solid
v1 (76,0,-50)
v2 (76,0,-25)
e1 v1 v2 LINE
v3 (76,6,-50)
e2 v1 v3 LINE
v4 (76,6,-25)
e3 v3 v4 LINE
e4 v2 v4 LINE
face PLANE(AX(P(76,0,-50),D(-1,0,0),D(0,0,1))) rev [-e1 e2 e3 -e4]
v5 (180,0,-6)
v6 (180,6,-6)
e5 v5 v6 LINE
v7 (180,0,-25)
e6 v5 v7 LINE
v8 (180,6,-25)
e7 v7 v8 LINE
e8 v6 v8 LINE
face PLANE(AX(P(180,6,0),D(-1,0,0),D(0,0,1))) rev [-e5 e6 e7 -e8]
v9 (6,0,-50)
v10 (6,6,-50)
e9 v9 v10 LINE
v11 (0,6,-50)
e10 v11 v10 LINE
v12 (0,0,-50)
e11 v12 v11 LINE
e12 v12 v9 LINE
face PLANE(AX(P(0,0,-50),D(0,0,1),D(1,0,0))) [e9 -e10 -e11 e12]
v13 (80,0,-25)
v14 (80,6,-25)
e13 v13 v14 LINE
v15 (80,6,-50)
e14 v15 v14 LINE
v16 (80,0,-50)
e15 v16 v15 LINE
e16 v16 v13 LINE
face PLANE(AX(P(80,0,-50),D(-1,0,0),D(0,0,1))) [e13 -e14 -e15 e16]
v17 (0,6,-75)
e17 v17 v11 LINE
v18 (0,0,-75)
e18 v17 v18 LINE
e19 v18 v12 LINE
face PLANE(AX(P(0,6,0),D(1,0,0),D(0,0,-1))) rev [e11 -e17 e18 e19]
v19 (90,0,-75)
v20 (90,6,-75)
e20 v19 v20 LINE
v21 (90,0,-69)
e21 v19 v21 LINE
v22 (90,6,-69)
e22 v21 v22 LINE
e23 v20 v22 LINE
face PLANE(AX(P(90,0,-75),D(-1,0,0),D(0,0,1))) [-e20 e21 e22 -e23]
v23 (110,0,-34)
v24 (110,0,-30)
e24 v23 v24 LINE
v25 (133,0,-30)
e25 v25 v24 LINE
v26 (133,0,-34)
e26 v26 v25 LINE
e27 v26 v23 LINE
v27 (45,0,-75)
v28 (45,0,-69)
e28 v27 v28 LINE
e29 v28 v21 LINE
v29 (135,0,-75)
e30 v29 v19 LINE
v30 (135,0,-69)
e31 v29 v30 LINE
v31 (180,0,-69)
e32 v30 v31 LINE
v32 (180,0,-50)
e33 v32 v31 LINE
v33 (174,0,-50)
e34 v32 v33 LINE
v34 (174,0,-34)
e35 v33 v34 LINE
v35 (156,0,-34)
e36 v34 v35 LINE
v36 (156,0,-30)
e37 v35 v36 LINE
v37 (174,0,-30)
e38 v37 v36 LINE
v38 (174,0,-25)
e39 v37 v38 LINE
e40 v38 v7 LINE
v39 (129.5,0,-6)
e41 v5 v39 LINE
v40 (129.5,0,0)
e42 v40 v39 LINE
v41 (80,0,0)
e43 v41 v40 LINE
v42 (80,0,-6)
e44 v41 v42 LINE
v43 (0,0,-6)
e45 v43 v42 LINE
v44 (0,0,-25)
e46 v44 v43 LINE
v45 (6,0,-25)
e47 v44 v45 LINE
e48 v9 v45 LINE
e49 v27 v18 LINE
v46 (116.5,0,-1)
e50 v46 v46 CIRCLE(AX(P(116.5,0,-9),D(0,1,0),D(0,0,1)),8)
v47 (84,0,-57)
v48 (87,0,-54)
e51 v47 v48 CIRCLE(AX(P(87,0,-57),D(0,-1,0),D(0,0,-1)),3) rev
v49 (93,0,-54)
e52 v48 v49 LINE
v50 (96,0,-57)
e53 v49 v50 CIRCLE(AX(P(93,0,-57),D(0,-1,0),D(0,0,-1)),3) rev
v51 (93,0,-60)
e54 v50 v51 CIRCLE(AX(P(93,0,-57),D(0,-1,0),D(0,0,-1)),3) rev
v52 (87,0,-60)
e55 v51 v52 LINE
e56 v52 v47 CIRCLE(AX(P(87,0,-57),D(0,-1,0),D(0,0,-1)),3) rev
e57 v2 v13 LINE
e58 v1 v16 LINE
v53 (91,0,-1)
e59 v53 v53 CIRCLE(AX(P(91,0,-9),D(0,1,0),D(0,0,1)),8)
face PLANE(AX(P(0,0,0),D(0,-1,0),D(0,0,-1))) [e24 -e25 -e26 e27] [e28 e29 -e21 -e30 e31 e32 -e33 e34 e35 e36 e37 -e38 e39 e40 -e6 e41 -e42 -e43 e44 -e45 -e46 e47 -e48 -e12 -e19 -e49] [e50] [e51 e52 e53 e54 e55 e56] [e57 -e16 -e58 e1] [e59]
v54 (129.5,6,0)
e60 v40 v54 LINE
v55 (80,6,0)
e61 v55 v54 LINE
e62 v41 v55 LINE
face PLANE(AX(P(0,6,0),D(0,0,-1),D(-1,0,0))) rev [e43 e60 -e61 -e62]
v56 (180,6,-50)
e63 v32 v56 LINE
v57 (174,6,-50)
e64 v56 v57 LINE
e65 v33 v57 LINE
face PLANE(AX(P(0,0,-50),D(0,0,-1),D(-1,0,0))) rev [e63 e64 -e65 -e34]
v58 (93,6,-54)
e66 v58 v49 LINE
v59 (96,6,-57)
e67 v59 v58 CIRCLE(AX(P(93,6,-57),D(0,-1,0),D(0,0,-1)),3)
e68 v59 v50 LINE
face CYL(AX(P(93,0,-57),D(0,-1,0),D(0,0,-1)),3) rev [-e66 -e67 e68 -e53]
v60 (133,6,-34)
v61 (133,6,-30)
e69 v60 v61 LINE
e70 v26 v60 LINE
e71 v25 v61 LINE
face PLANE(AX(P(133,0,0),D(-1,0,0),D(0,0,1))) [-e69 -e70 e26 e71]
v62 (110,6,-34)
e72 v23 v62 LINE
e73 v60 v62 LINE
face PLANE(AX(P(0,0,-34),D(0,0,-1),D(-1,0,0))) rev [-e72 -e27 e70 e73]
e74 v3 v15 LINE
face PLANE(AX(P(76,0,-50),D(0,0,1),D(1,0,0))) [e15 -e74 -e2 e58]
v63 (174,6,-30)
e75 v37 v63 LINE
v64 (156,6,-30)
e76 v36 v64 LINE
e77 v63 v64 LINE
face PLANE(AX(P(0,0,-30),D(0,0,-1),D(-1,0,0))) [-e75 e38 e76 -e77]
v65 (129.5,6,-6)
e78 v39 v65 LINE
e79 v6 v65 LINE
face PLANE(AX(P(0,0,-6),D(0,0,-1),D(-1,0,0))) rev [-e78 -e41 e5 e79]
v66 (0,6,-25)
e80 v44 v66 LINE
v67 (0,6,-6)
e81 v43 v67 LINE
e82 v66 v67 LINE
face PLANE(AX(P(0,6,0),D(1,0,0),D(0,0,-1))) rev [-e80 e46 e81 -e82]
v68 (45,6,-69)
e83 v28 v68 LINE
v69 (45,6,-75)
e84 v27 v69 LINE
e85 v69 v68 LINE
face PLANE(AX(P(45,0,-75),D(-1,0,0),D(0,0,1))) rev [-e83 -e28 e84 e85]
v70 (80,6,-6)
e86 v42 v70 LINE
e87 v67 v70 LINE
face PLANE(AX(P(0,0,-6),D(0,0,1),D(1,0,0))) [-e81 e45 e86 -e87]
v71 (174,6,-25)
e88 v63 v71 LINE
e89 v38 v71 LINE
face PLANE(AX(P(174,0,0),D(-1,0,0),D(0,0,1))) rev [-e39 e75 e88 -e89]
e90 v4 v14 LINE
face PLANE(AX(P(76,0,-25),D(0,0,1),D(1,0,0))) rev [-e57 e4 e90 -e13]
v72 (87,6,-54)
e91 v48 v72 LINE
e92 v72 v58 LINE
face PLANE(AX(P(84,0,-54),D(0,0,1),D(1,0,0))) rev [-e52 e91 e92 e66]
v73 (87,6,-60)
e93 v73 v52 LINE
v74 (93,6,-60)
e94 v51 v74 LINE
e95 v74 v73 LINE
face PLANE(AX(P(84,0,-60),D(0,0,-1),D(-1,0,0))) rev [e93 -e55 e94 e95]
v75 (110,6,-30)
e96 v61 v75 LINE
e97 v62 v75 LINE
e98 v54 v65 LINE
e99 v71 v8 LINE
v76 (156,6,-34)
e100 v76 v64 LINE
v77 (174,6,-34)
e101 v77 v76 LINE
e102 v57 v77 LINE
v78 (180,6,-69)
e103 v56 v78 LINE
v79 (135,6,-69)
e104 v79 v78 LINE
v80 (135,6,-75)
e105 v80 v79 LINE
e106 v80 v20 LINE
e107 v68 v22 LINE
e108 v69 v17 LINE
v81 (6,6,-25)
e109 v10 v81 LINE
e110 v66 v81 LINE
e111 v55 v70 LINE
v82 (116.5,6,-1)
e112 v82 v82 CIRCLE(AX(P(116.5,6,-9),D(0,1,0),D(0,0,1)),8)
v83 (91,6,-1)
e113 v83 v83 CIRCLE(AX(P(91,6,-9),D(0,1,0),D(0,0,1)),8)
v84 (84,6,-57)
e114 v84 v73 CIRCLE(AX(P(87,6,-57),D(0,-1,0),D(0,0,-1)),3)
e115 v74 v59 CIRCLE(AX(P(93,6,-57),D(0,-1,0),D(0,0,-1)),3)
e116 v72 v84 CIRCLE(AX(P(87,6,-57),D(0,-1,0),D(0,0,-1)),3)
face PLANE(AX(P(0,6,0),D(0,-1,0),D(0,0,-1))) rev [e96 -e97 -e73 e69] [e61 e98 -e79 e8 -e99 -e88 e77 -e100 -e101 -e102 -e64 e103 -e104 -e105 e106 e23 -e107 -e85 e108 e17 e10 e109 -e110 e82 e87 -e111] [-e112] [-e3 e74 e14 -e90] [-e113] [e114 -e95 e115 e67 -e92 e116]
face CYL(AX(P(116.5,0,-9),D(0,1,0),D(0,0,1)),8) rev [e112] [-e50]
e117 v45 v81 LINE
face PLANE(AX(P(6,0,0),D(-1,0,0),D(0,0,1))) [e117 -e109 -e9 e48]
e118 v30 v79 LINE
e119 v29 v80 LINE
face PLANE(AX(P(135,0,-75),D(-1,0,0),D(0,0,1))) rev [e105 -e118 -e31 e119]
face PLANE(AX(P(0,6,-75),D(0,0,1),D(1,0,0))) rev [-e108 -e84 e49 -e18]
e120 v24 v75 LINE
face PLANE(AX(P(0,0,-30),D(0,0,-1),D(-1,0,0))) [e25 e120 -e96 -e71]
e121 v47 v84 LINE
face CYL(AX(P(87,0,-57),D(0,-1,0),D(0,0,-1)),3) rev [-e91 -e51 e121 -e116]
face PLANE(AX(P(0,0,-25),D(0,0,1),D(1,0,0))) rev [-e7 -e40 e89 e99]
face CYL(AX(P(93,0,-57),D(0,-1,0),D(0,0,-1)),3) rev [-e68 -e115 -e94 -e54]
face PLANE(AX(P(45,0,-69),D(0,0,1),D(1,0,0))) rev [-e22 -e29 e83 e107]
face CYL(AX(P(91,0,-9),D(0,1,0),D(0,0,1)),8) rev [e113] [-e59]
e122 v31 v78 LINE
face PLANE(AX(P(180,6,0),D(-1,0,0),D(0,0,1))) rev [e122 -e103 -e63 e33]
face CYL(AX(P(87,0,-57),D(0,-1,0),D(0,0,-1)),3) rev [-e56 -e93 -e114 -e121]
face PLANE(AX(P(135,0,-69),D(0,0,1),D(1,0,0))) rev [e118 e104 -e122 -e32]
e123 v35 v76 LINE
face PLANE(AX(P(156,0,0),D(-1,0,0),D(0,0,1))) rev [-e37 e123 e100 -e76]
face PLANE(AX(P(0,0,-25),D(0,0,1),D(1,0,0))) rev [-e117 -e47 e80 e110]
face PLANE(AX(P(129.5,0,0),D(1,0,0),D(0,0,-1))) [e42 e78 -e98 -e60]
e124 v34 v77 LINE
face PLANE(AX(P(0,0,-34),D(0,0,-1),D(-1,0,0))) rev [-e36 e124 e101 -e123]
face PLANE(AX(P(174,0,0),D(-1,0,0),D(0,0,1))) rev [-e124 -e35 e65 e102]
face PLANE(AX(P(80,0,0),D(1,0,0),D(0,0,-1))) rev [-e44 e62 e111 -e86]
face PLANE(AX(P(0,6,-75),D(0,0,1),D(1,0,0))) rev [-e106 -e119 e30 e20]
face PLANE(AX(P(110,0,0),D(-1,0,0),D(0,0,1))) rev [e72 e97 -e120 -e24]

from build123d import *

# Parameters (mm, degrees)
SKETCH1_W           = 180
SKETCH1_H           = 75
BOSS_EXTRUDE1_DEPTH = 6
SKETCH2_W           = 23
SKETCH2_H           = 4
SKETCH2_W_2         = 24
SKETCH2_W_3         = 4
SKETCH2_H_2         = 25
CUT_EXTRUDE1_DEPTH  = 6
SKETCH3_R           = 8
SKETCH3_W           = 12
SKETCH3_H           = 6
CUT_EXTRUDE5_DEPTH  = 196.092285855
FILLET1_R           = 3
SKETCH4_W           = 44.5
SKETCH4_H           = 6
SKETCH4_W_2         = 6
SKETCH4_H_2         = 5
SKETCH4_H_3         = 16
SKETCH4_H_4         = 25
SKETCH4_W_3         = 74
SKETCH4_W_4         = 45
CUT_EXTRUDE6_DEPTH  = 196.092285855


with BuildPart() as part:
    # Sketch1 → Boss-Extrude1 (new body)
    with BuildSketch(Plane(origin=(0, 0, 0), x_dir=(1, 0, 0), z_dir=(0, 1, 0))):
        with Locations((90, 37.5)):
            Rectangle(SKETCH1_W, SKETCH1_H)
    extrude(amount=BOSS_EXTRUDE1_DEPTH)

    # Sketch2 → Cut-Extrude1 (cut)
    with BuildSketch(Plane(origin=(0, 6, 0), x_dir=(1, 0, 0), z_dir=(0, 1, 0))):
        with Locations((121.5, 32)):
            Rectangle(SKETCH2_W, SKETCH2_H)
        with Locations((168, 32)):
            Rectangle(SKETCH2_W_2, SKETCH2_H)
        with Locations((78, 37.5)):
            Rectangle(SKETCH2_W_3, SKETCH2_H_2)
    extrude(amount=-CUT_EXTRUDE1_DEPTH, mode=Mode.SUBTRACT)

    # Sketch3 → Cut-Extrude5 (cut, through all)
    with BuildSketch(Plane(origin=(0, 6, 0), x_dir=(1, 0, 0), z_dir=(0, 1, 0))):
        with Locations(Location((91, 9, 0), (0, 0, 270))):
            Circle(SKETCH3_R)
        with Locations(Location((116.5, 9, 0), (0, 0, 270))):
            Circle(SKETCH3_R)
        with Locations((90, 57)):
            Rectangle(SKETCH3_W, SKETCH3_H)
    extrude(amount=-CUT_EXTRUDE5_DEPTH, mode=Mode.SUBTRACT)

    # Fillet1
    fillet1_edges = [part.edges().sort_by_distance(p)[0] for p in [
        (96, 3, -54),
        (96, 3, -60),
        (84, 3, -54),
        (84, 3, -60),
    ]]
    fillet(fillet1_edges, radius=FILLET1_R - 0.0001)  # a hair under: the kernel refuses the full size

    # Sketch4 → Cut-Extrude6 (cut, through all)
    with BuildSketch(Plane(origin=(0, 6, 0), x_dir=(1, 0, 0), z_dir=(0, 1, 0))):
        with Locations((151.75, 3)):
            Rectangle(SKETCH4_W, SKETCH4_H)
        with Locations((177, 3)):
            Rectangle(SKETCH4_W_2, SKETCH4_H)
        with Locations((177, 27.5)):
            Rectangle(SKETCH4_W_2, SKETCH4_H_2)
        with Locations((177, 42)):
            Rectangle(SKETCH4_W_2, SKETCH4_H_3)
        with Locations((3, 37.5)):
            Rectangle(SKETCH4_W_2, SKETCH4_H_4)
        with Locations((3, 3)):
            Rectangle(SKETCH4_W_2, SKETCH4_H)
        with Locations((43, 3)):
            Rectangle(SKETCH4_W_3, SKETCH4_H)
        with Locations((157.5, 72)):
            Rectangle(SKETCH4_W_4, SKETCH4_H)
        with Locations((67.5, 72)):
            Rectangle(SKETCH4_W_4, SKETCH4_H)
    extrude(amount=-CUT_EXTRUDE6_DEPTH, mode=Mode.SUBTRACT)


solid = part.part
